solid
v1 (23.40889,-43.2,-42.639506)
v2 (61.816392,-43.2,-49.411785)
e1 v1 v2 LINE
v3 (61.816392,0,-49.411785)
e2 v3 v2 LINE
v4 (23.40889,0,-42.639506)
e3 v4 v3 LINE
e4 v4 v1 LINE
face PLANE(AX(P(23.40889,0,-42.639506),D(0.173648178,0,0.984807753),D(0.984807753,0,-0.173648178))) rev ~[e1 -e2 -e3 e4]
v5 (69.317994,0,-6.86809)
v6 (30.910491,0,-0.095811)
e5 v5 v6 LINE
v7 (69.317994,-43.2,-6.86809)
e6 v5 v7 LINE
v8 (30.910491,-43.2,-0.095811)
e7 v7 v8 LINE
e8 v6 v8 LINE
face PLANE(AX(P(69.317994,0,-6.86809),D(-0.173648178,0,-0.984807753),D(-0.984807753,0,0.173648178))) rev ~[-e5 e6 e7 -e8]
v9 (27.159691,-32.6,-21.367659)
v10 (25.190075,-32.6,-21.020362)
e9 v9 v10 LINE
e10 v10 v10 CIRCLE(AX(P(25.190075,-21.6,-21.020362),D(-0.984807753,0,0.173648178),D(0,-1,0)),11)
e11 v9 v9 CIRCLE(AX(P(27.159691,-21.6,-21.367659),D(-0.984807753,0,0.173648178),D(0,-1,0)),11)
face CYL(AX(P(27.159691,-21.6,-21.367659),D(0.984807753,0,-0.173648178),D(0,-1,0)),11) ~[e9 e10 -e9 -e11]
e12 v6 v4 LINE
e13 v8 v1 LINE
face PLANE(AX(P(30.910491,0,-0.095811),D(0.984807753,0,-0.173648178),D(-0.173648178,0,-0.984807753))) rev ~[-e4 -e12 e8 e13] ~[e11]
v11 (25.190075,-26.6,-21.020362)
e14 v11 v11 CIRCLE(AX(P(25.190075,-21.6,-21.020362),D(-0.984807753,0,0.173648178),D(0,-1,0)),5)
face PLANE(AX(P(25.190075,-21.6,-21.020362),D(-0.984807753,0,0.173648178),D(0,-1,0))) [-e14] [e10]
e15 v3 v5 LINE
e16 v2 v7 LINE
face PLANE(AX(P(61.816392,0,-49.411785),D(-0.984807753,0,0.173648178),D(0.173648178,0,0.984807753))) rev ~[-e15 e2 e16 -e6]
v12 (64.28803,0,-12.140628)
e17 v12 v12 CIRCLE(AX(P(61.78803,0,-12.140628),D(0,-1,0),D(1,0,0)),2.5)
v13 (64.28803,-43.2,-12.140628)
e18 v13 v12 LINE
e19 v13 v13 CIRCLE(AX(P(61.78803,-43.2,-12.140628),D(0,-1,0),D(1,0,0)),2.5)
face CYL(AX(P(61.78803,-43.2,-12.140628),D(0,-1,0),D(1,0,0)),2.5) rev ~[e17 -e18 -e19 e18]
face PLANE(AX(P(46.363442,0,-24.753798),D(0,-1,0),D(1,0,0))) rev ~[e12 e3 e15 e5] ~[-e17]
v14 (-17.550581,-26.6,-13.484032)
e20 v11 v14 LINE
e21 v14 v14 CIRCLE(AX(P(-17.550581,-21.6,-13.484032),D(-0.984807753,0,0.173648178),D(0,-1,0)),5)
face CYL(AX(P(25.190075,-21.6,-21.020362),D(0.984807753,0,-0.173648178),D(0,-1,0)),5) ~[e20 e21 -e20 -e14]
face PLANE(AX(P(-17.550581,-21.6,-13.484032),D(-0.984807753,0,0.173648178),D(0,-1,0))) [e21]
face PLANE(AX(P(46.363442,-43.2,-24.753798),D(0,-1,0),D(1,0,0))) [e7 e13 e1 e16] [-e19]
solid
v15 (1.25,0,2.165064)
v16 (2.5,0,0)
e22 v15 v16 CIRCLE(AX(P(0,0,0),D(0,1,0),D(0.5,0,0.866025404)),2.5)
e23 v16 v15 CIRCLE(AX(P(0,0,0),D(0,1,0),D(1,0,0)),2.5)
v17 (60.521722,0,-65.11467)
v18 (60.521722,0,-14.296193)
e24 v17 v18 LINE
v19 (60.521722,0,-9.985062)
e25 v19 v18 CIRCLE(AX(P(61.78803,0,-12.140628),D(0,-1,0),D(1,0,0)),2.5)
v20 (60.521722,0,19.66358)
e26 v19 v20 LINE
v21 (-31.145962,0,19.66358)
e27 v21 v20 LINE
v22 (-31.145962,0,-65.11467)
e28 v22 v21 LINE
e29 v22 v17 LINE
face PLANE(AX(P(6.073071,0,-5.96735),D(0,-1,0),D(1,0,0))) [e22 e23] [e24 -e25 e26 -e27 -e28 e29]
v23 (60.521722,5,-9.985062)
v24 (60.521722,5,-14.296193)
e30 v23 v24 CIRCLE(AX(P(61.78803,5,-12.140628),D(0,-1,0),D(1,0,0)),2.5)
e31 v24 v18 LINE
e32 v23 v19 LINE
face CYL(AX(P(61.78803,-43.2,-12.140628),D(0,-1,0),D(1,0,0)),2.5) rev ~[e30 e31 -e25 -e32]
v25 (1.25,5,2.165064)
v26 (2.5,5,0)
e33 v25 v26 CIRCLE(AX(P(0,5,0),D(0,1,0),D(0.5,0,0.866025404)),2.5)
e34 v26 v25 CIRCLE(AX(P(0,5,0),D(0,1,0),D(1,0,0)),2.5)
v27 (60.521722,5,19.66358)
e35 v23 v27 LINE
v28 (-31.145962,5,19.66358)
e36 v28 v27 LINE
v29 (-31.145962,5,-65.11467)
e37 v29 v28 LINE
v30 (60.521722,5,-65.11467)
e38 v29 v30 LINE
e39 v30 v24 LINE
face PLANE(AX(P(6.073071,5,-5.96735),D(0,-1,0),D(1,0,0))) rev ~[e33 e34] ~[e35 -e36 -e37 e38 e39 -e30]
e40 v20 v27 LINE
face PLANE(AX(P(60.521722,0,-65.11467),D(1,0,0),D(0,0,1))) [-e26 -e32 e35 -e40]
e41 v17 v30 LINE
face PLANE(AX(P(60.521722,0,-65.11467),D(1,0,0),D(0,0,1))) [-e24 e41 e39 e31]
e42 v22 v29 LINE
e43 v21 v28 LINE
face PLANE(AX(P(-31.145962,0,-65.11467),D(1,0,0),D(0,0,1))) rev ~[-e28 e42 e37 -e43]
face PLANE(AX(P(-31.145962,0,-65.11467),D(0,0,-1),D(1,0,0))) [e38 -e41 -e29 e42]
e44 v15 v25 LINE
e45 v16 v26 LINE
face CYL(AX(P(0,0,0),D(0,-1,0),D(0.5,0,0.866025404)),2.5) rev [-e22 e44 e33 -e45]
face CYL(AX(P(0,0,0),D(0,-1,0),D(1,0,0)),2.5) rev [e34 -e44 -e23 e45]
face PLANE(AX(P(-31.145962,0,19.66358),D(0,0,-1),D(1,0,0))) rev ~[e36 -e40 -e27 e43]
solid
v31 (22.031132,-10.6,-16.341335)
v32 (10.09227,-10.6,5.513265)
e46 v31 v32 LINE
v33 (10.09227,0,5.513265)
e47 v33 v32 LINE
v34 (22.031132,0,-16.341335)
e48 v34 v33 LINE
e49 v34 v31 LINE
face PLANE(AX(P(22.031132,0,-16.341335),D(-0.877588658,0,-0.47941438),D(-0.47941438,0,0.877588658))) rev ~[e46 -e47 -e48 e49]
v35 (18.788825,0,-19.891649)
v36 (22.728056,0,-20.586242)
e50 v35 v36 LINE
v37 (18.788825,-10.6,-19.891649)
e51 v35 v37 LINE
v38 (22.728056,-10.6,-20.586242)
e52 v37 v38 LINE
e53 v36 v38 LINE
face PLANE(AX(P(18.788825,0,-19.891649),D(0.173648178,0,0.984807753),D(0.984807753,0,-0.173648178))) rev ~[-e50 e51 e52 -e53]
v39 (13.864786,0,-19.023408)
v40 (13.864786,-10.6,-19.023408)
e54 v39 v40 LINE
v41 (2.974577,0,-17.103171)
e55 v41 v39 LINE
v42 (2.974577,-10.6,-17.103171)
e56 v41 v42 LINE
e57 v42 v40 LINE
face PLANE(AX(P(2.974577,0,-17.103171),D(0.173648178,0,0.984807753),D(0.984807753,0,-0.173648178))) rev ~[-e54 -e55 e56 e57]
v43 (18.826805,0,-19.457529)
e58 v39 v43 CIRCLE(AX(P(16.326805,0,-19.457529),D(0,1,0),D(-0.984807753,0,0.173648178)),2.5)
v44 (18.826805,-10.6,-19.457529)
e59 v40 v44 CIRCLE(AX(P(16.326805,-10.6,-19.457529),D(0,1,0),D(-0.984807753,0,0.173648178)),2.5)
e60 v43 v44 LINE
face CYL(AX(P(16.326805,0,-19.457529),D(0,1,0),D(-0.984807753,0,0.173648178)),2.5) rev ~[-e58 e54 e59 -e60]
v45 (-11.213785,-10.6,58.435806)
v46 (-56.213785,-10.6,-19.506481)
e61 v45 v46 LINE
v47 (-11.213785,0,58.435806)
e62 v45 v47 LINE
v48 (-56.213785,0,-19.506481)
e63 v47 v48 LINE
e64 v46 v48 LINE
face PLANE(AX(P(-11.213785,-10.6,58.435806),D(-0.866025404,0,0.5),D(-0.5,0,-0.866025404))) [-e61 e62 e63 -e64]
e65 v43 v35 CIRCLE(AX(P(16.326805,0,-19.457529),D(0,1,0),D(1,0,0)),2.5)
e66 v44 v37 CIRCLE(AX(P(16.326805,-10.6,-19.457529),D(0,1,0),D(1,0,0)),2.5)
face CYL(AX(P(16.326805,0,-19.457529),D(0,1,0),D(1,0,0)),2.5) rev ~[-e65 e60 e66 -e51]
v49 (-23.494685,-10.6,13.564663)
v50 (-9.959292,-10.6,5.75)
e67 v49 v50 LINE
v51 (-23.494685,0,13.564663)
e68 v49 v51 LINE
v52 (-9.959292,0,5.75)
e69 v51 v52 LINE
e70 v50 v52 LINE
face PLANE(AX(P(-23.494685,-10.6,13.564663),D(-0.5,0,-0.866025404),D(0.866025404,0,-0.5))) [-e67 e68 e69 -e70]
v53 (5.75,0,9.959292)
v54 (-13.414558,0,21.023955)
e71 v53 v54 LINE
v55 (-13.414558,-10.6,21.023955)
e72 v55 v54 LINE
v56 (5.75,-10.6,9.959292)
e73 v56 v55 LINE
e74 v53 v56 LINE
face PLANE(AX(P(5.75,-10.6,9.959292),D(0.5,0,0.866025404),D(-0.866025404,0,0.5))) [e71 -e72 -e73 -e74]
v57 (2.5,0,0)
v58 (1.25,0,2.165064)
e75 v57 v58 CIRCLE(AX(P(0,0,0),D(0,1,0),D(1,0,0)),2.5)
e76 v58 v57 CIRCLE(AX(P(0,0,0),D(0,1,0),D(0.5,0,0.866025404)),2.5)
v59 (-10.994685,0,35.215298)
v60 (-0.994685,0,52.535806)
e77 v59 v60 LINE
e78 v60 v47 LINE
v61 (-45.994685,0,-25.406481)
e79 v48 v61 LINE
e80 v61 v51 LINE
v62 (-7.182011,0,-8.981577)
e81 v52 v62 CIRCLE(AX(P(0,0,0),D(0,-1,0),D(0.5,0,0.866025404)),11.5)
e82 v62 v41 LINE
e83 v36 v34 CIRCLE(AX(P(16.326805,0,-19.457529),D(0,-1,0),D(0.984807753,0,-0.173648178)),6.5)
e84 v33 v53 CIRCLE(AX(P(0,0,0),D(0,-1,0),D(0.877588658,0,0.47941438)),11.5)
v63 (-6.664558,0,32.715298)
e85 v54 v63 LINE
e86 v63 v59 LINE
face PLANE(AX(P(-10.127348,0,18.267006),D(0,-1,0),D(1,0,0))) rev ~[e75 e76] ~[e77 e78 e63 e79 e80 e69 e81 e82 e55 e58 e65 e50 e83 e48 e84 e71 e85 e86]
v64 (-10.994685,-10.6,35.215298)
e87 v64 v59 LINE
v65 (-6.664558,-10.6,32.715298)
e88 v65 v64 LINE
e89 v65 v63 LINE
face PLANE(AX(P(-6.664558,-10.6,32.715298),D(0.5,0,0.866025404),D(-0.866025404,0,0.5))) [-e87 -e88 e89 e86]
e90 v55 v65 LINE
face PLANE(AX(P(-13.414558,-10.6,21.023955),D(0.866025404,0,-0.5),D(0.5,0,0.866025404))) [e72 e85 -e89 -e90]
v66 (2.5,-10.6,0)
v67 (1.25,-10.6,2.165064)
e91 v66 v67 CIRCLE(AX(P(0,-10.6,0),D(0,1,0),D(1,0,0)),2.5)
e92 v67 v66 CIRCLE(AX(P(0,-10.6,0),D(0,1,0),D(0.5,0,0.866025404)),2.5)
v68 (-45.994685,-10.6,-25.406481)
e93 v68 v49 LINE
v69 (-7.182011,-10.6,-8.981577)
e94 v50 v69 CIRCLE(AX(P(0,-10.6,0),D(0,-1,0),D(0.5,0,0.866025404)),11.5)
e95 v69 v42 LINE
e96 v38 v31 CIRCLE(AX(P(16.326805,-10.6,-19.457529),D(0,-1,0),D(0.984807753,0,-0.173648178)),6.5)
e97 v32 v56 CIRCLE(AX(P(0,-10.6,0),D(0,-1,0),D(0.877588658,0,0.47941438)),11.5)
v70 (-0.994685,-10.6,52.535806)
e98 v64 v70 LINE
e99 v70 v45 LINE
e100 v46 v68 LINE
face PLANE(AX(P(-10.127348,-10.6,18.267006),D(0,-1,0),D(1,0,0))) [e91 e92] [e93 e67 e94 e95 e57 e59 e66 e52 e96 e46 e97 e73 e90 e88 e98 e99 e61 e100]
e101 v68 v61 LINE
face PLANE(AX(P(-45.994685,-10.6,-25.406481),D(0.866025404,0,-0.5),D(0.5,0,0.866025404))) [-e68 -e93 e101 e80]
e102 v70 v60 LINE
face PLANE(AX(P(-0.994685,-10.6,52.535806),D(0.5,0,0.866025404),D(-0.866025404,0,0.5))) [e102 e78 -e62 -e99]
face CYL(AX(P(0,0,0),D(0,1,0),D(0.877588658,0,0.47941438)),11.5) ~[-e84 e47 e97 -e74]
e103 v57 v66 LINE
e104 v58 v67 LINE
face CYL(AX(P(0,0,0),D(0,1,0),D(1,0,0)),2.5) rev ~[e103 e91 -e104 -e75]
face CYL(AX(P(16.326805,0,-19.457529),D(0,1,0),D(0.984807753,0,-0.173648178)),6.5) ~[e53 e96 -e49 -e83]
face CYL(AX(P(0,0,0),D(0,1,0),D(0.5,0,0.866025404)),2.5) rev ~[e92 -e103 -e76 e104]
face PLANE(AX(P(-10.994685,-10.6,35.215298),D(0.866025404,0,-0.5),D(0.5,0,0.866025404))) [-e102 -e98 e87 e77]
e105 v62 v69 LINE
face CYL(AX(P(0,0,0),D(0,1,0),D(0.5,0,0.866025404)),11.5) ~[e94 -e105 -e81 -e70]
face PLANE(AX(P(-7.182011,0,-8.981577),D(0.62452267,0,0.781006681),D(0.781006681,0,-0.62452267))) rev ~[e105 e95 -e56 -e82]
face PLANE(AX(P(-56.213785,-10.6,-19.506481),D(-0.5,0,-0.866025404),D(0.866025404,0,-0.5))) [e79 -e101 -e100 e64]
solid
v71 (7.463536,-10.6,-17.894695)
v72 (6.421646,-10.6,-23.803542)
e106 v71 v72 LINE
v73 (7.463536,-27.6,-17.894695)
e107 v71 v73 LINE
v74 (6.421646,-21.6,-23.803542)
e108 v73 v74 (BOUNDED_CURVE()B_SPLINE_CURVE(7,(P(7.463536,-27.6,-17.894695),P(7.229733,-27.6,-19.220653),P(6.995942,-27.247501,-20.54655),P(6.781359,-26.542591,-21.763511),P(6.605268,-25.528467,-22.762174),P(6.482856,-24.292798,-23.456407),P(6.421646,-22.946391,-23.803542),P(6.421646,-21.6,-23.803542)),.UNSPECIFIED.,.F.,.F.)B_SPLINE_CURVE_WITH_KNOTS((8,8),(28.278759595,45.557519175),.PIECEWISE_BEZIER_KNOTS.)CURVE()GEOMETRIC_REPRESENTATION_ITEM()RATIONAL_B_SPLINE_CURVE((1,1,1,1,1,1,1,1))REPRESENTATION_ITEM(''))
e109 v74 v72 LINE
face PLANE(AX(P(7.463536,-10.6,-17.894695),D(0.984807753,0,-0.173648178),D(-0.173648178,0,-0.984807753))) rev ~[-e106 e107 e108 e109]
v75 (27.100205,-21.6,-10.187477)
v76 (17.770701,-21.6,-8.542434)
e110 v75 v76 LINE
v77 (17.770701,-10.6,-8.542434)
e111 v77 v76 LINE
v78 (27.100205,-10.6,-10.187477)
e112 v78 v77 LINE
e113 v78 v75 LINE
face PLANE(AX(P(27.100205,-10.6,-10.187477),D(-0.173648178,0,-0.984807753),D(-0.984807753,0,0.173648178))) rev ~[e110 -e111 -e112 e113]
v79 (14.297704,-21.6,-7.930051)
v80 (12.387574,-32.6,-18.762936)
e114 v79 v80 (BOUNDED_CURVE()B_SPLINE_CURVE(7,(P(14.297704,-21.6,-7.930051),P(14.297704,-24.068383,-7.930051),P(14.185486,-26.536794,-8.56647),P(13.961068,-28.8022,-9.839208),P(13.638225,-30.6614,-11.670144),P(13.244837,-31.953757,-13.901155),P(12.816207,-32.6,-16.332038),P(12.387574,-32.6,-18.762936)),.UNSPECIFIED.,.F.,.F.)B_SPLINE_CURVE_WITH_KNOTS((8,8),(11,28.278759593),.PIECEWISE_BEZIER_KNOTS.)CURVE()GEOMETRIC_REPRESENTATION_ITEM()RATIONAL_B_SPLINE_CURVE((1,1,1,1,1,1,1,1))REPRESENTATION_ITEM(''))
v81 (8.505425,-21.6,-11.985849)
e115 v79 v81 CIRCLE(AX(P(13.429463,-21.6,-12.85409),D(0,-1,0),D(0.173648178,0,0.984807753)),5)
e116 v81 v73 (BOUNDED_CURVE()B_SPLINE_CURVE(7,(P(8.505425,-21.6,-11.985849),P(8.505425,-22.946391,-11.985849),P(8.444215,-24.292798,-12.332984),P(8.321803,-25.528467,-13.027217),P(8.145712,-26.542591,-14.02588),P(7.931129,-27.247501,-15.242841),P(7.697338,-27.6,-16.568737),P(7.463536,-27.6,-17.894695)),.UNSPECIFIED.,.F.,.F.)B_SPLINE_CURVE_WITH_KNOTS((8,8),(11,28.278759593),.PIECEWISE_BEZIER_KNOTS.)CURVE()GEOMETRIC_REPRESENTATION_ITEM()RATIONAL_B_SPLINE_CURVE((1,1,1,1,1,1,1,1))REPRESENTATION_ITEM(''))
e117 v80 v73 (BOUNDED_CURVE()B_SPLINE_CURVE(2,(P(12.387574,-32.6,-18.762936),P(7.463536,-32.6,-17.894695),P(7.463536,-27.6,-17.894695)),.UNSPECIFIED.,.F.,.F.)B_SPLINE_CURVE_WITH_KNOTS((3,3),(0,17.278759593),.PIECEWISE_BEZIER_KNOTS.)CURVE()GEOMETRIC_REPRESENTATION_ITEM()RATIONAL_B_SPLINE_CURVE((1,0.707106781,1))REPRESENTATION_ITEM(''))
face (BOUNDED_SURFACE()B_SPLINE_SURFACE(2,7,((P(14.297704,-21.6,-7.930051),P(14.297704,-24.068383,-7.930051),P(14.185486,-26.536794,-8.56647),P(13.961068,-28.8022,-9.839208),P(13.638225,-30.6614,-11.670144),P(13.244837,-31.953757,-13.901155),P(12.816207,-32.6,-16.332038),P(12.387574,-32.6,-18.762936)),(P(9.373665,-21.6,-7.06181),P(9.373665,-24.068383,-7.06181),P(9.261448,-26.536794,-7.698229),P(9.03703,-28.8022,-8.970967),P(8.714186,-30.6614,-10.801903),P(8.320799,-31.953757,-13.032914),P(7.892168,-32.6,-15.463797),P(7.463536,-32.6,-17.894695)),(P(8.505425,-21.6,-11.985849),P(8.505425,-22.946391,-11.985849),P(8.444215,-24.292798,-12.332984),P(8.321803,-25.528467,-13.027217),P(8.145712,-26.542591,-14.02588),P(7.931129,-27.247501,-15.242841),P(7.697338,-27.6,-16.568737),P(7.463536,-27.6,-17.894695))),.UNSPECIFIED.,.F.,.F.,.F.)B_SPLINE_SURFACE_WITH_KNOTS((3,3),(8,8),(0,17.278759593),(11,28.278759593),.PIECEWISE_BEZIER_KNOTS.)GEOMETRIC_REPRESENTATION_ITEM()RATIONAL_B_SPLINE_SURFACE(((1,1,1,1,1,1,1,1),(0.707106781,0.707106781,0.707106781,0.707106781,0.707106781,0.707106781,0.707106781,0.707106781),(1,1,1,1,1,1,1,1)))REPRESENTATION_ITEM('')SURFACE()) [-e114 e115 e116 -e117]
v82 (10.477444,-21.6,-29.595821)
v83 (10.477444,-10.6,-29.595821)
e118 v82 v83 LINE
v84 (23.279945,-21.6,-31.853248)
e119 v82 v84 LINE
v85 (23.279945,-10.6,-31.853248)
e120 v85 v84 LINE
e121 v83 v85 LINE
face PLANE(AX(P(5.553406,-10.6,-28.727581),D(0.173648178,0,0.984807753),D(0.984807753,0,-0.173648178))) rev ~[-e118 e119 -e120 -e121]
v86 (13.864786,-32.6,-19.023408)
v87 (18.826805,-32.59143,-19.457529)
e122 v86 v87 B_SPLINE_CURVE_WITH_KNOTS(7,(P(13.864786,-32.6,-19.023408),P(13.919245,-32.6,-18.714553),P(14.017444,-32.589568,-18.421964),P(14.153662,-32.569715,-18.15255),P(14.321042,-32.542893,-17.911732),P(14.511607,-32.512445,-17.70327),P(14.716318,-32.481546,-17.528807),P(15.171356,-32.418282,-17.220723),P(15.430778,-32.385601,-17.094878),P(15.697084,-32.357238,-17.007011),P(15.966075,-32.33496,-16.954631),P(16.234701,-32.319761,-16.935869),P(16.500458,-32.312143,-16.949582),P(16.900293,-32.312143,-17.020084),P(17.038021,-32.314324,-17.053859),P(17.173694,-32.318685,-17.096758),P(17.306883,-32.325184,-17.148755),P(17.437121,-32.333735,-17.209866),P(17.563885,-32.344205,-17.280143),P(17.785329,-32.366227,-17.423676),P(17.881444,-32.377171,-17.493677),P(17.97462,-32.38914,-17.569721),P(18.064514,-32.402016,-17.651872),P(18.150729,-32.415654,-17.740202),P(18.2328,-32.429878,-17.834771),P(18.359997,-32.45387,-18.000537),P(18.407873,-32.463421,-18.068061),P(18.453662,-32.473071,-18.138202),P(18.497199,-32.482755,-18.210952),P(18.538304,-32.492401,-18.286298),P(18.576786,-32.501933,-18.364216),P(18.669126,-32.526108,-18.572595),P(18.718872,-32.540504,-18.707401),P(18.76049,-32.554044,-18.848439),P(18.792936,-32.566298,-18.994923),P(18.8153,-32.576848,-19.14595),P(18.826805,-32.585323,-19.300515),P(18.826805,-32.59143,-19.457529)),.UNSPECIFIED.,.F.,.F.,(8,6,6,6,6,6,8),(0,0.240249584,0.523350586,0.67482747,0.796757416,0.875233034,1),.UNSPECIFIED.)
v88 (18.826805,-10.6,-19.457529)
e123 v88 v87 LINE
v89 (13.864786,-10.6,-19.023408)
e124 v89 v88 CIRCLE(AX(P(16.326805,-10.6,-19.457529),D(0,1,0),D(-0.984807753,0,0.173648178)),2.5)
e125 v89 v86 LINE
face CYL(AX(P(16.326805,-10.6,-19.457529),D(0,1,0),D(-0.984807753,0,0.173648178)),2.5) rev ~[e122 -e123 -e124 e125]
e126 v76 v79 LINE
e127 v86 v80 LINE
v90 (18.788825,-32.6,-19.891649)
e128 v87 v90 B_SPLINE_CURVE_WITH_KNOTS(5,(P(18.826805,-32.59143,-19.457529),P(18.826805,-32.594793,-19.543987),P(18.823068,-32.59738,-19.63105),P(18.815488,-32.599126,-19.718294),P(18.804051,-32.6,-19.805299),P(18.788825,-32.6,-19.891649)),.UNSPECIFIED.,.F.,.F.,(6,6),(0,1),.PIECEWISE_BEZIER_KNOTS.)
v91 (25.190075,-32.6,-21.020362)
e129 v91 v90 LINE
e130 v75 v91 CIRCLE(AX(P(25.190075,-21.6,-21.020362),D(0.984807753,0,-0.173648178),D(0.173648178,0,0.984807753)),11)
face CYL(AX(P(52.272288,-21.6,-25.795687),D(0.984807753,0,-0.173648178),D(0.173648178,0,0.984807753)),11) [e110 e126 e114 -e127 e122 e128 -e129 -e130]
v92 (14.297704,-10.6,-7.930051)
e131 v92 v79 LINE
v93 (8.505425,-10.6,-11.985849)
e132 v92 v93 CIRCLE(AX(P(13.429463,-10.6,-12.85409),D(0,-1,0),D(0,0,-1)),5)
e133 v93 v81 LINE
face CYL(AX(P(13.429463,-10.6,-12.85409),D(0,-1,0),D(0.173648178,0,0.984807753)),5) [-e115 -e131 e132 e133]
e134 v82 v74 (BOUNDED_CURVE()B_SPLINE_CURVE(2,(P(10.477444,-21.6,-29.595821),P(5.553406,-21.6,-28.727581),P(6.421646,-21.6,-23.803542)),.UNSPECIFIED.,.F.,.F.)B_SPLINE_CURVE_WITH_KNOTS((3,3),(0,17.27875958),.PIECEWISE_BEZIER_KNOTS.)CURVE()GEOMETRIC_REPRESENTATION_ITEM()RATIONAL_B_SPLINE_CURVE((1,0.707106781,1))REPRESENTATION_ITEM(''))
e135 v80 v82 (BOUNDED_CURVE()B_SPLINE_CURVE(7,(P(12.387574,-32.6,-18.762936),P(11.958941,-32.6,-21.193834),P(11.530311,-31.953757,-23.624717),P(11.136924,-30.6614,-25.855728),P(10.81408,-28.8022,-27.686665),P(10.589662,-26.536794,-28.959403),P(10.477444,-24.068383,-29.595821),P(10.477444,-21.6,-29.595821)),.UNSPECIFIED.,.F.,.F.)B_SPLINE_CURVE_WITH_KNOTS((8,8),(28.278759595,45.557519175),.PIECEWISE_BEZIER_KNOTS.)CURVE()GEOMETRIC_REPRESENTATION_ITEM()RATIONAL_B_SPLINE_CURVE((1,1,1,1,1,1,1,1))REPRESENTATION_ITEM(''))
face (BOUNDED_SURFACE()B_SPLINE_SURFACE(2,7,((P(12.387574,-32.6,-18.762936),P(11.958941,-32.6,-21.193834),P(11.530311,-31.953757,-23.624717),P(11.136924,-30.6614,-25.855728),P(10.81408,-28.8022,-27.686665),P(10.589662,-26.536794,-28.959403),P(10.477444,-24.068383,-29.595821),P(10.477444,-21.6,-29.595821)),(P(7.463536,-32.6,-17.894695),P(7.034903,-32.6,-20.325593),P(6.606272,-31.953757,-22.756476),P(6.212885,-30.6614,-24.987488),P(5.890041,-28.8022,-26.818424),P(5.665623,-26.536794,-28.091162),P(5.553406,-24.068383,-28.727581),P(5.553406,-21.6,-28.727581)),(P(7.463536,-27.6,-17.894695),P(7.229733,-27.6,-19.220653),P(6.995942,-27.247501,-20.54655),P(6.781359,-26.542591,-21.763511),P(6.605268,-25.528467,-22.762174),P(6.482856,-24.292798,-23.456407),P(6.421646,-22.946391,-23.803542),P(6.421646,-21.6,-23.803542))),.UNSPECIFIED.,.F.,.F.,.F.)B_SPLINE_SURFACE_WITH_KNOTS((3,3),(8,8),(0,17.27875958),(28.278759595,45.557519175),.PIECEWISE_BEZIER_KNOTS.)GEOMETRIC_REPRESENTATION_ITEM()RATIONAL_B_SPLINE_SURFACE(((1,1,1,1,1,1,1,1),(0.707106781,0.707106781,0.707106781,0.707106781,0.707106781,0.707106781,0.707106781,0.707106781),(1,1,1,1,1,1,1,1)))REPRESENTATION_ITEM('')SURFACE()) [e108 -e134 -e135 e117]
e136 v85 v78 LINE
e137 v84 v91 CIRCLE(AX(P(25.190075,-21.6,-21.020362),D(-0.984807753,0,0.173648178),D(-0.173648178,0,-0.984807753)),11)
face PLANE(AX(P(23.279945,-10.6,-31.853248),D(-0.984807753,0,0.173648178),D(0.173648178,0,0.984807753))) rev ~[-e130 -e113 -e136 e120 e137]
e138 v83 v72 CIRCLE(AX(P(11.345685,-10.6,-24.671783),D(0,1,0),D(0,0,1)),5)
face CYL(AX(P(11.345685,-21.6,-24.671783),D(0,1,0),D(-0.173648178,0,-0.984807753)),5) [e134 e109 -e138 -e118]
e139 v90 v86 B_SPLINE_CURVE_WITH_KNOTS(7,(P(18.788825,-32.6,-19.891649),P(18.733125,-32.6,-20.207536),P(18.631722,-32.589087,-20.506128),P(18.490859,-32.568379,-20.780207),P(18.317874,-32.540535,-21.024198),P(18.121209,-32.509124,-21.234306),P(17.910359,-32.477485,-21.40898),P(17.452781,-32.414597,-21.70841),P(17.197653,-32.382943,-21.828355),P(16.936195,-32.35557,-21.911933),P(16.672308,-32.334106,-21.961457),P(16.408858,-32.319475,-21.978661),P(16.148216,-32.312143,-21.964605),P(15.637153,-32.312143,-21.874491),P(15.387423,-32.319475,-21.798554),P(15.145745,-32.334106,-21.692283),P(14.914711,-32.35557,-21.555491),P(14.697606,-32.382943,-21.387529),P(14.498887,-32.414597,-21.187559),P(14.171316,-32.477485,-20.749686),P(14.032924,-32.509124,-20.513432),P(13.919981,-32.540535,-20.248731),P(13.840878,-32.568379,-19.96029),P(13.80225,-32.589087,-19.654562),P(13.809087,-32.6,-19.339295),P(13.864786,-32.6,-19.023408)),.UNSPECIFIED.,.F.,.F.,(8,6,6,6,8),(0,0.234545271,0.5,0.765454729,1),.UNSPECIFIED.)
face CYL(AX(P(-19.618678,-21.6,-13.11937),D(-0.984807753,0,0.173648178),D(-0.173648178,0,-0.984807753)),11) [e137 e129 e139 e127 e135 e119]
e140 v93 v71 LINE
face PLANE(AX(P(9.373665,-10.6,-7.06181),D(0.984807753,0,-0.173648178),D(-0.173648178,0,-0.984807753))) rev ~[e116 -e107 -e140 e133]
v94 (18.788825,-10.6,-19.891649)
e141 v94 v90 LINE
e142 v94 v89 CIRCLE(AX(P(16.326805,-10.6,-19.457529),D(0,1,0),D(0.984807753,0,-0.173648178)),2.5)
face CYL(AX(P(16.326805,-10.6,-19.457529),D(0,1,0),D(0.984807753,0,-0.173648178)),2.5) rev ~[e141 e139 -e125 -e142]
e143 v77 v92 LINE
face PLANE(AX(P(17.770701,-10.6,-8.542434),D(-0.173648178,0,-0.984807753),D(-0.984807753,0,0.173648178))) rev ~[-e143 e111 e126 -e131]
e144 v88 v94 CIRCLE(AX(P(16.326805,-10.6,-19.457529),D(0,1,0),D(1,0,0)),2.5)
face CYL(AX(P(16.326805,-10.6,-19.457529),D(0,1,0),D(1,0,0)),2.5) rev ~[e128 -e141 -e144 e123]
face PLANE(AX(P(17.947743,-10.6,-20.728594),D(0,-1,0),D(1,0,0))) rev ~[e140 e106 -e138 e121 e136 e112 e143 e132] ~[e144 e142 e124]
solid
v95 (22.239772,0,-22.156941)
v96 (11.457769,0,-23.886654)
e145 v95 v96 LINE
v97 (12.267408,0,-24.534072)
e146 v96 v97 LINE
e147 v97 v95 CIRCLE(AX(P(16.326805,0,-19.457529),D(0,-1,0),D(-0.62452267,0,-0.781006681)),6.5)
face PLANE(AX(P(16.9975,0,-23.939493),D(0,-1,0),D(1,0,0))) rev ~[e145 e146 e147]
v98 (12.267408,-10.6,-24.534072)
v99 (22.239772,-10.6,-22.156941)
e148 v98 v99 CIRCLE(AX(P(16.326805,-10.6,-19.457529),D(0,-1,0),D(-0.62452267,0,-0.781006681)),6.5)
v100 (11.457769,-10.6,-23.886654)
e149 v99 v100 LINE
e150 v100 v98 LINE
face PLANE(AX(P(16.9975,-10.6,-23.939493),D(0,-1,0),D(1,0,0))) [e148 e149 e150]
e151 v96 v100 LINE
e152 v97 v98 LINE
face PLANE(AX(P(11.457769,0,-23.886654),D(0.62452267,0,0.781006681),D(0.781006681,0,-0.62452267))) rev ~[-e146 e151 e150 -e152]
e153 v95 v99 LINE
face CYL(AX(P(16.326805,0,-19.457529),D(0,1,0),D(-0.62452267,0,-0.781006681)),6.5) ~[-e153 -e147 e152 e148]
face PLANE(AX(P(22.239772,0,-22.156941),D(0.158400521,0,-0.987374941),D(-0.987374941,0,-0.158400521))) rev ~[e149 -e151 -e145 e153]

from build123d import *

# Parameters (mm, degrees)
F1_DEPTH    = 10.6
F2_DEPTH    = 43.2
F3_R        = 11
F4_DEPTH    = 2
F5_R        = 5
F6_DEPTH    = 43.4
F8_DEPTH    = 22
F9_T1_DEPTH = 73
F9_T3_DEPTH = 73
F10_W       = 91.6676837951
F10_H       = 84.7782492638
F11_DEPTH   = 5
F12_R       = 2.5
F13_DEPTH   = 74.8
F15_DEPTH   = 10.6
F16_R       = 5


# Not quite as in the source:
# - a fillet or chamfer that OpenCascade refuses, or shapes differently, is made with other operations: its cross-section is extruded or revolved along the edge and cut away or added
# - a feature names something its author has since deleted; it is built from what else it names


with BuildPart() as f1:
    # F0 (on Front) → F1 (new body)
    with BuildSketch(Plane.XZ):
        with BuildLine():
            Line((22.031131561, -16.3413353843), (10.0922695634, 5.5132653717))
            ThreePointArc((10.0922695634, 5.5132653717), (8.2271601871, 8.0351624287), (5.75, 9.9592921435))
            ThreePointArc((5.75, 9.9592921435), (-9.4974624505, 6.4844588827), (-7.1820107007, -8.9815768268))
            Line((-7.1820107007, -8.9815768268), (2.9745766929, -17.1031707017))
            Line((2.9745766929, -17.1031707017), (13.8647859035, -19.0234084111))
            ThreePointArc((13.8647859035, -19.0234084111), (16.5446946429, -16.96704211), (18.826805286, -19.4575288552))
            ThreePointArc((18.826805286, -19.4575288552), (18.8172920313, -19.6754182121), (18.7888246686, -19.8916492994))
            Line((18.7888246686, -19.8916492994), (22.7280556806, -20.5862420101))
            ThreePointArc((22.7280556806, -20.5862420101), (22.7409345871, -18.4044641332), (22.031131561, -16.3413353843))
        make_face()
        with BuildLine():
            ThreePointArc((2.5, 0), (-2.1650635095, -1.25), (1.25, 2.1650635095))
            ThreePointArc((1.25, 2.1650635095), (2.1650635095, 1.25), (2.5, 0))
        make_face(mode=Mode.SUBTRACT)
    extrude(amount=F1_DEPTH)

    # F14 (on face) → F15 (join)
    with BuildSketch(Plane.XZ.offset(10.6)):
        with BuildLine():
            Line((-17.7446848749, 23.5239547806), (-23.4946848749, 13.564662637))
            Line((-23.4946848749, 13.564662637), (-9.9592921435, 5.75))
            ThreePointArc((-9.9592921435, 5.75), (-2.9764190187, 11.1081470023), (5.75, 9.9592921435))
            Line((5.75, 9.9592921435), (-13.414557856, 21.0239547806))
            Line((-13.414557856, 21.0239547806), (-6.664557856, 32.7152977317))
            Line((-6.664557856, 32.7152977317), (-10.9946848749, 35.2152977317))
            Line((-10.9946848749, 35.2152977317), (-17.7446848749, 23.5239547806))
        make_face()
        Polygon((-41.6238499995, -4.8359724576), (-35.9946848749, -8.0859724576), (-23.4946848749, 13.564662637), (-17.7446848749, 23.5239547806), (-10.9946848749, 35.2152977317), (-16.6238499995, 38.4652977317), align=None)
        Polygon((-45.9946848749, -25.4064805333), (-35.9946848749, -8.0859724576), (-41.6238499995, -4.8359724576), (-16.6238499995, 38.4652977317), (-10.9946848749, 35.2152977317), (-0.9946848749, 52.5358058073), (-11.2137846395, 58.4358058073), (-56.2137846395, -19.5064805333), align=None)
    extrude(amount=-F15_DEPTH)


with BuildPart() as f1b:
    # F0 (on Front) → F1, piece 2 (new body)
    with BuildSketch(Plane.XZ):
        with BuildLine():
            ThreePointArc((12.2674079335, -24.5340722791), (17.833993936, -25.7803749211), (22.2397717789, -22.1569412458))
            Line((22.2397717789, -22.1569412458), (11.4577686407, -23.8866538829))
            Line((11.4577686407, -23.8866538829), (12.2674079335, -24.5340722791))
        make_face()
    extrude(amount=F1_DEPTH)


with BuildPart() as f2:
    # F0 (on Front) → F2 (new body)
    with BuildSketch(Plane.XZ):
        Polygon((30.9104912068, -0.0958113445), (27.1596905692, -21.3676588096), (23.4088899316, -42.6395062746), (61.816392299, -49.4117852036), (69.3179935743, -6.8680902735), align=None)
    extrude(amount=F2_DEPTH)

    # F3 (on face) → F4 (join)
    with BuildSketch(Plane(origin=(29.9948105542, 0, -5.2888943819), x_dir=(0, -1, 0), z_dir=(-0.984807753, 0, 0.1736481777))):
        with Locations((21.6, -16.326805286)):
            Circle(F3_R)
    extrude(amount=F4_DEPTH)

    # F5 (on face) → F6 (join)
    with BuildSketch(Plane(origin=(28.0251950482, 0, -4.9415980266), x_dir=(0, -1, 0), z_dir=(-0.984807753, 0, 0.1736481777))):
        with Locations((21.6, -16.326805286)):
            Circle(F5_R)
    extrude(amount=F6_DEPTH)


with BuildPart() as f8:
    # F7 (on face) → F8 (new body)
    with BuildSketch(Plane.XZ.offset(10.6)):
        with BuildLine():
            ThreePointArc((18.7888246686, -19.8916492994), (15.8926848419, -21.9195482378), (13.8647859035, -19.0234084111))
            Line((13.8647859035, -19.0234084111), (7.4635355089, -17.8946952562))
            Line((7.4635355089, -17.8946952562), (5.5534055546, -28.7275805394))
            Line((5.5534055546, -28.7275805394), (23.2799451088, -31.8532477374))
            Line((23.2799451088, -31.8532477374), (27.1002050175, -10.1874771711))
            Line((27.1002050175, -10.1874771711), (17.7707010183, -8.5424338994))
            Line((17.7707010183, -8.5424338994), (22.031131561, -16.3413353843))
            ThreePointArc((22.031131561, -16.3413353843), (22.7409345871, -18.4044641332), (22.7280556806, -20.5862420101))
            Line((22.7280556806, -20.5862420101), (18.7888246686, -19.8916492994))
        make_face()
        with BuildLine():
            ThreePointArc((13.8647859035, -19.0234084111), (16.5446946429, -16.96704211), (18.826805286, -19.4575288552))
            ThreePointArc((18.826805286, -19.4575288552), (18.8172920313, -19.6754182121), (18.7888246686, -19.8916492994))
            Line((18.7888246686, -19.8916492994), (22.7280556806, -20.5862420101))
            ThreePointArc((22.7280556806, -20.5862420101), (22.7409345871, -18.4044641332), (22.031131561, -16.3413353843))
            Line((22.031131561, -16.3413353843), (17.7707010183, -8.5424338994))
            Line((17.7707010183, -8.5424338994), (9.3736654633, -7.0618099731))
            Line((9.3736654633, -7.0618099731), (7.4635355089, -17.8946952562))
            Line((7.4635355089, -17.8946952562), (13.8647859035, -19.0234084111))
        make_face()
    extrude(amount=F8_DEPTH)

    # F9: fillet of radius 11 on 2 edges, made by hand

    # F9_s2 → F9_t1 (cut)
    with BuildSketch(Plane(origin=(55.107408256, 0, -9.7169229125), x_dir=(0, 1, 0), z_dir=(-0.984807753, 0, 0.1736481777))):
        with BuildLine():
            ThreePointArc((-21.6, 5.326805286), (-29.3781745931, 8.548630693), (-32.6, 16.326805286))
            Line((-32.6, 16.326805286), (-32.6, 5.326805286))
            Line((-32.6, 5.326805286), (-21.6, 5.326805286))
        make_face()
    extrude(amount=F9_T1_DEPTH, mode=Mode.SUBTRACT)

    # F9_s4 → F9_t3 (cut)
    with BuildSketch(Plane(origin=(-16.7835577139, 0, 2.9593940572), x_dir=(0, 1, 0), z_dir=(0.984807753, 0, -0.1736481777))):
        with BuildLine():
            ThreePointArc((-21.6, -27.326805286), (-29.3781745931, -24.1049798791), (-32.6, -16.326805286))
            Line((-32.6, -16.326805286), (-32.6, -27.326805286))
            Line((-32.6, -27.326805286), (-21.6, -27.326805286))
        make_face()
    extrude(amount=F9_T3_DEPTH, mode=Mode.SUBTRACT)

    # F16
    f16_edges = [f8.edges().sort_by_distance(p)[0] for p in [
        (8.814201, -29.378175, -10.234689),
        (5.553406, -16.1, -28.727581),
        (6.11287, -29.378175, -25.554702),
        (9.373665, -16.1, -7.06181),
    ]]
    fillet(f16_edges, radius=F16_R)


with BuildPart() as f11:
    # F10 (on face) → F11 (new body)
    with BuildSketch(Plane.XZ):
        with Locations((14.6878799424, -22.7255448699)):
            Rectangle(F10_W, F10_H)
        with BuildLine():
            Line((10.0922695634, 5.5132653717), (22.031131561, -16.3413353843))
            ThreePointArc((22.031131561, -16.3413353843), (22.7409345871, -18.4044641332), (22.7280556806, -20.5862420101))
            Line((22.7280556806, -20.5862420101), (18.7888246686, -19.8916492994))
            ThreePointArc((18.7888246686, -19.8916492994), (18.8172920313, -19.6754182121), (18.826805286, -19.4575288552))
            ThreePointArc((18.826805286, -19.4575288552), (16.5446946429, -16.96704211), (13.8647859035, -19.0234084111))
            Line((13.8647859035, -19.0234084111), (2.9745766929, -17.1031707017))
            Line((2.9745766929, -17.1031707017), (-7.1820107007, -8.9815768268))
            ThreePointArc((-7.1820107007, -8.9815768268), (-9.4974624505, 6.4844588827), (5.75, 9.9592921435))
            ThreePointArc((5.75, 9.9592921435), (8.2271601871, 8.0351624287), (10.0922695634, 5.5132653717))
        make_face(mode=Mode.SUBTRACT)
    extrude(amount=-F11_DEPTH)

    # F0 (on Front) → F11, piece 2 (join)
    with BuildSketch(Plane.XZ):
        with BuildLine():
            Line((22.031131561, -16.3413353843), (10.0922695634, 5.5132653717))
            ThreePointArc((10.0922695634, 5.5132653717), (8.2271601871, 8.0351624287), (5.75, 9.9592921435))
            ThreePointArc((5.75, 9.9592921435), (-9.4974624505, 6.4844588827), (-7.1820107007, -8.9815768268))
            Line((-7.1820107007, -8.9815768268), (2.9745766929, -17.1031707017))
            Line((2.9745766929, -17.1031707017), (13.8647859035, -19.0234084111))
            ThreePointArc((13.8647859035, -19.0234084111), (16.5446946429, -16.96704211), (18.826805286, -19.4575288552))
            ThreePointArc((18.826805286, -19.4575288552), (18.8172920313, -19.6754182121), (18.7888246686, -19.8916492994))
            Line((18.7888246686, -19.8916492994), (22.7280556806, -20.5862420101))
            ThreePointArc((22.7280556806, -20.5862420101), (22.7409345871, -18.4044641332), (22.031131561, -16.3413353843))
        make_face()
        with BuildLine():
            ThreePointArc((2.5, 0), (-2.1650635095, -1.25), (1.25, 2.1650635095))
            ThreePointArc((1.25, 2.1650635095), (2.1650635095, 1.25), (2.5, 0))
        make_face(mode=Mode.SUBTRACT)
        with BuildLine():
            ThreePointArc((13.8647859035, -19.0234084111), (15.8926848419, -21.9195482378), (18.7888246686, -19.8916492994))
            Line((18.7888246686, -19.8916492994), (13.8647859035, -19.0234084111))
        make_face()
        with BuildLine():
            Line((13.8647859035, -19.0234084111), (18.7888246686, -19.8916492994))
            ThreePointArc((18.7888246686, -19.8916492994), (18.8172920313, -19.6754182121), (18.826805286, -19.4575288552))
            ThreePointArc((18.826805286, -19.4575288552), (16.5446946429, -16.96704211), (13.8647859035, -19.0234084111))
        make_face()
    extrude(amount=-F11_DEPTH)


with BuildPart() as f13_tool:
    # F12 (on face) → F13 (new body)
    with BuildSketch(Plane.XZ.offset(43.2)):
        with Locations((61.7880300248, -12.1406275132)):
            Circle(F12_R)
    extrude(amount=-F13_DEPTH)


with BuildPart() as f2_1:
    add(f2.part)

    # F13: cut by f13_tool
    add(f13_tool.part, mode=Mode.SUBTRACT)


with BuildPart() as f11_1:
    add(f11.part)

    # F13: cut by f13_tool
    add(f13_tool.part, mode=Mode.SUBTRACT)


solid = Compound([f1.part, f1b.part, f8.part, f2_1.part, f11_1.part])
